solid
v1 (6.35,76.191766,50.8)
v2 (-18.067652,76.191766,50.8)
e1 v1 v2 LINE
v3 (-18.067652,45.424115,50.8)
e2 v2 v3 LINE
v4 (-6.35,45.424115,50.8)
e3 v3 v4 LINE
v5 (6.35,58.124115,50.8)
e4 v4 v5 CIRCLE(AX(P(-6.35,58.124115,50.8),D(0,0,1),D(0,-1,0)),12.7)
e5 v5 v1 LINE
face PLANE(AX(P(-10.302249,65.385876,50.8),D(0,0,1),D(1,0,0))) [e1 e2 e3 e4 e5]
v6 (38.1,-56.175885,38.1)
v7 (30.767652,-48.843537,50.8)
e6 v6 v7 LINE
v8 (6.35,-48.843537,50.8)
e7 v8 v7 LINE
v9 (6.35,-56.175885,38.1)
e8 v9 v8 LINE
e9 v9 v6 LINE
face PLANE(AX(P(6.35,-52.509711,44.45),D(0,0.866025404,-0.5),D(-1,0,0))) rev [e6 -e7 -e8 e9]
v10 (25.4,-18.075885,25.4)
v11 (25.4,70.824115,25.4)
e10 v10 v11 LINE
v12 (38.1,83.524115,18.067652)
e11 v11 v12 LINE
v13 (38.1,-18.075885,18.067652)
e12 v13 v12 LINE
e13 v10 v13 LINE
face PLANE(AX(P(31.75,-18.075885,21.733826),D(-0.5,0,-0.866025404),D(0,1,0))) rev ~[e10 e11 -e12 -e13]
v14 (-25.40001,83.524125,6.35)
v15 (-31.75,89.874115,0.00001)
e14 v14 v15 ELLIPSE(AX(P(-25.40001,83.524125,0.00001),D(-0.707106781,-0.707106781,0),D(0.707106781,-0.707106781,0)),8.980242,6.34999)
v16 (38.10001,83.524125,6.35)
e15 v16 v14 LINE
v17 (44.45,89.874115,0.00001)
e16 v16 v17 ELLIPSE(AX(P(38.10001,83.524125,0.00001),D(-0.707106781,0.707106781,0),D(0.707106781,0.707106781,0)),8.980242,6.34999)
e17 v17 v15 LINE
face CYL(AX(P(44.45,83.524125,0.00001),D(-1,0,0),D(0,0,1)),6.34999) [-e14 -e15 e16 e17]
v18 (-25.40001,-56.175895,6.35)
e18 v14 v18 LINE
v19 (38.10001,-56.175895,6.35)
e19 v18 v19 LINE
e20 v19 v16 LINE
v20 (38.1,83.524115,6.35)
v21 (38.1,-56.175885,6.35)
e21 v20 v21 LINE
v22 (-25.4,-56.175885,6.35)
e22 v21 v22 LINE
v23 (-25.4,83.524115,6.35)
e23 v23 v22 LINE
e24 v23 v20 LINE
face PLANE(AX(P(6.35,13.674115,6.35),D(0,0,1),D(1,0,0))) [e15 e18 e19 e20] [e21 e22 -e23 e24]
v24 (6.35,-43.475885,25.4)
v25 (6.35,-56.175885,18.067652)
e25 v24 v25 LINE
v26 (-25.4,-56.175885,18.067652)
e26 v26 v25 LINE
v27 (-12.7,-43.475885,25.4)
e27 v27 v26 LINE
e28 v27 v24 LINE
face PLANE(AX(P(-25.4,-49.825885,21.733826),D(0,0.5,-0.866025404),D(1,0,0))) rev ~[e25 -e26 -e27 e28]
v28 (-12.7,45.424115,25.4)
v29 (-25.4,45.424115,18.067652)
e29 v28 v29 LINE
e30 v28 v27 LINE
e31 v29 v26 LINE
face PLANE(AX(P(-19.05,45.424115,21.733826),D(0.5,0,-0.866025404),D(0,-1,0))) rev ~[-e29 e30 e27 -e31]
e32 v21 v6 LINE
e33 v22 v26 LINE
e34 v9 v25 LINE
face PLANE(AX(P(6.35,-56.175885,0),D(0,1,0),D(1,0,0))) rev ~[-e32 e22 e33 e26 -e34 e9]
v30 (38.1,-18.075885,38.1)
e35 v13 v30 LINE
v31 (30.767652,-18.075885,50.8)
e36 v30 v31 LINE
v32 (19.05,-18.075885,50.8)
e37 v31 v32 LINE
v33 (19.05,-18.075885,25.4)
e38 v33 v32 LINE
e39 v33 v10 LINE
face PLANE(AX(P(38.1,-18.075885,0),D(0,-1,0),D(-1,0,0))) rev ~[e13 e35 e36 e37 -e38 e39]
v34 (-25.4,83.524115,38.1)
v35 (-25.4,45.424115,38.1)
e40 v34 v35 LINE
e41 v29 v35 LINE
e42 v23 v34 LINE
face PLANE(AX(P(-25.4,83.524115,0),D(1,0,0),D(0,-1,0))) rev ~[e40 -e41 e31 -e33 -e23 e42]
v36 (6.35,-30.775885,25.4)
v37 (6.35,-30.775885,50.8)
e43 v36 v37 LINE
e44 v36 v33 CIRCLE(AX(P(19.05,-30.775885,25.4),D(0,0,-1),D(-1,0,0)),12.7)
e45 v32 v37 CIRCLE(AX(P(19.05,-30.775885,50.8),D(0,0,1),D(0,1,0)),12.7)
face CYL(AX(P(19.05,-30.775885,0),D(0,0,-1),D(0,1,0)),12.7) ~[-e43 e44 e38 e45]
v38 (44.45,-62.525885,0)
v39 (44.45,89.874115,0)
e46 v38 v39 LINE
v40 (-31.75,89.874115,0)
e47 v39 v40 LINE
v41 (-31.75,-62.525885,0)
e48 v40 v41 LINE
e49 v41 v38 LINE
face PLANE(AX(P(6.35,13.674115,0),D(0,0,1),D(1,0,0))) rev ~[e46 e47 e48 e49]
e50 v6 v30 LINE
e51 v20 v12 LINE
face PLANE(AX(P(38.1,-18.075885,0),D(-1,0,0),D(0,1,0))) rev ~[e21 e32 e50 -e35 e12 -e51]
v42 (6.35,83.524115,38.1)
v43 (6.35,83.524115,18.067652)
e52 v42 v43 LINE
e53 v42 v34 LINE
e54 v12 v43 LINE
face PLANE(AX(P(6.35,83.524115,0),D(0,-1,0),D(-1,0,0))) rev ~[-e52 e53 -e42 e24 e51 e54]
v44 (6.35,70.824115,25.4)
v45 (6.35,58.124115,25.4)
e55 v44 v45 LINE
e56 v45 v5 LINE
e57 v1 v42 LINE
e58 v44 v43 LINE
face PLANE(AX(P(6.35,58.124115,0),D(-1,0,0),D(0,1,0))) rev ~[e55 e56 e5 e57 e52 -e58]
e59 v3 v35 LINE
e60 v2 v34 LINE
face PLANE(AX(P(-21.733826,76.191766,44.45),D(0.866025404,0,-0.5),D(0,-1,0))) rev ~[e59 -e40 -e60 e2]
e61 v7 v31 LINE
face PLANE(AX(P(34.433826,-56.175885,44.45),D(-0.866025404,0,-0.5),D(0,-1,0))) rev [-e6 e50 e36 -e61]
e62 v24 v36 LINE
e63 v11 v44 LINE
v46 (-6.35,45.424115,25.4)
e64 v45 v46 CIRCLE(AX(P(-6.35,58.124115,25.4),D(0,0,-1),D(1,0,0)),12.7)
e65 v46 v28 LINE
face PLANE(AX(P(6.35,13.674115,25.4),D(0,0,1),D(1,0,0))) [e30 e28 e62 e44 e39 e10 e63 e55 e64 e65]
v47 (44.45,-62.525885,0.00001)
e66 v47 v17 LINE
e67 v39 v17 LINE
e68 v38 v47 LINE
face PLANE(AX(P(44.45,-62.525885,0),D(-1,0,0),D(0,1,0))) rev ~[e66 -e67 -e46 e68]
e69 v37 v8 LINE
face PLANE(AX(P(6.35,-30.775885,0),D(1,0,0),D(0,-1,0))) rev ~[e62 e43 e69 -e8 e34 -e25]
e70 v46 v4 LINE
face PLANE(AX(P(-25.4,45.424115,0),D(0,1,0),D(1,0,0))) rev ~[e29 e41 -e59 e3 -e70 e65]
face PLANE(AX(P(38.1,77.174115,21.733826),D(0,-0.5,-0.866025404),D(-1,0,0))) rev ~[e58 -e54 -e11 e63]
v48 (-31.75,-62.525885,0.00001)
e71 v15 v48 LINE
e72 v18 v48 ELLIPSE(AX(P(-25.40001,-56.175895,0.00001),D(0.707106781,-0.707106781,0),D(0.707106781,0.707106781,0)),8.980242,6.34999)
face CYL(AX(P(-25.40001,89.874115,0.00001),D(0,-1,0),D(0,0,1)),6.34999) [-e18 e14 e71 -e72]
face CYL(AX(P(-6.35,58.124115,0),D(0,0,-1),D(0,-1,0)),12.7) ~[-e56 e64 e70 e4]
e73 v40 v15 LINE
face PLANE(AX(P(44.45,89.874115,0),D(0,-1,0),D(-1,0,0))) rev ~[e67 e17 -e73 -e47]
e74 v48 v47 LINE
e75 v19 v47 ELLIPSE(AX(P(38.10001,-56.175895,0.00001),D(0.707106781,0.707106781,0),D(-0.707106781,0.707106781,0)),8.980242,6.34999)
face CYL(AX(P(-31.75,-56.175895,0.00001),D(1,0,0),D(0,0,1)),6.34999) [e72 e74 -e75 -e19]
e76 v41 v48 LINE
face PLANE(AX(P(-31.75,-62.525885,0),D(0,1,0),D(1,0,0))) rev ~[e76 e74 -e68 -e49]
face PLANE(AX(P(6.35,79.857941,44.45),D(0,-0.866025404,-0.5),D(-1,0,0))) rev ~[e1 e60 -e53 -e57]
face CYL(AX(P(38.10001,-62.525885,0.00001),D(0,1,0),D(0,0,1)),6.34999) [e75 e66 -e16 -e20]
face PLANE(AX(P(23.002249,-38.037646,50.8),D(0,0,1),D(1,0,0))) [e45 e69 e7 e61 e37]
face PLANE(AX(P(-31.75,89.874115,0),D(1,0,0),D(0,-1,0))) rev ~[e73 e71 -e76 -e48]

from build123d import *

# Parameters (mm, degrees)
F1_DEPTH    = 6.35
F2_DEPTH    = 25.4
F3_DEPTH    = 50.8
F4_C1_SIZE2 = 12.7
F4_C1_SIZE  = 7.3323484187
F4_C2_SIZE2 = 12.7
F4_C2_SIZE  = 7.3323484187
F5_SIZE2    = 7.3323484187
F5_SIZE     = 12.7
F6_SIZE2    = 7.3323484187
F6_SIZE     = 12.7
F7_R        = 6.34999


# Not quite as in the source:
# - a fillet or chamfer is up to 0.001 mm smaller than in the source, because OpenCascade refuses the exact size


with BuildPart() as f1:
    # F0 (on Top) → F1 (new body)
    with BuildSketch(Plane.XY):
        Polygon((44.45, 89.8741149127), (-31.75, 89.8741149127), (-31.75, 45.4241149127), (-31.75, -62.5258850873), (44.45, -62.5258850873), align=None)
        Polygon((-25.4, -56.1758850873), (-25.4, 45.4241149127), (-25.4, 83.5241149127), (6.35, 83.5241149127), (38.1, 83.5241149127), (38.1, -18.0758850873), (38.1, -56.1758850873), (6.35, -56.1758850873), align=None, mode=Mode.SUBTRACT)
    extrude(amount=F1_DEPTH)

    # F0 (on Top) → F2 (join)
    with BuildSketch(Plane.XY):
        with BuildLine():
            Line((-6.35, 45.4241149127), (-25.4, 45.4241149127))
            Line((-25.4, 45.4241149127), (-25.4, -56.1758850873))
            Line((-25.4, -56.1758850873), (6.35, -56.1758850873))
            Line((6.35, -56.1758850873), (6.35, -30.7758850873))
            ThreePointArc((6.35, -30.7758850873), (10.0697438789, -21.7956289662), (19.05, -18.0758850873))
            Line((19.05, -18.0758850873), (38.1, -18.0758850873))
            Line((38.1, -18.0758850873), (38.1, 83.5241149127))
            Line((38.1, 83.5241149127), (6.35, 83.5241149127))
            Line((6.35, 83.5241149127), (6.35, 58.1241149127))
            ThreePointArc((6.35, 58.1241149127), (2.6302561211, 49.1438587917), (-6.35, 45.4241149127))
        make_face()
    extrude(amount=F2_DEPTH)

    # F0 (on Top) → F3 (join)
    with BuildSketch(Plane.XY):
        with BuildLine():
            Line((-25.4, 83.5241149127), (-25.4, 45.4241149127))
            Line((-25.4, 45.4241149127), (-6.35, 45.4241149127))
            ThreePointArc((-6.35, 45.4241149127), (2.6302561211, 49.1438587917), (6.35, 58.1241149127))
            Line((6.35, 58.1241149127), (6.35, 83.5241149127))
            Line((6.35, 83.5241149127), (-25.4, 83.5241149127))
        make_face()
        with BuildLine():
            Line((6.35, -30.7758850873), (6.35, -56.1758850873))
            Line((6.35, -56.1758850873), (38.1, -56.1758850873))
            Line((38.1, -56.1758850873), (38.1, -18.0758850873))
            Line((38.1, -18.0758850873), (19.05, -18.0758850873))
            ThreePointArc((19.05, -18.0758850873), (10.0697438789, -21.7956289662), (6.35, -30.7758850873))
        make_face()
    extrude(amount=F3_DEPTH)

    # F4: chamfer of 12.7 x 7.3323484187 on 2 edges, made by hand

    # F4_c1
    f4_c1_edges = [f1.edges().sort_by_distance(p)[0] for p in [
        (-9.525, 83.5241149127, 50.8),
    ]]
    f4_c1_side = f1.faces().sort_by_distance((-9.525, 83.3774679444, 50.8))[0]
    chamfer(f4_c1_edges, length=F4_C1_SIZE, length2=F4_C1_SIZE2, reference=f4_c1_side)

    # F4_c2
    f4_c2_edges = [f1.edges().sort_by_distance(p)[0] for p in [
        (-25.4, 60.8079407034, 50.8),
    ]]
    f4_c2_side = f1.faces().sort_by_distance((-25.2533530316, 60.8079407034, 50.8))[0]
    chamfer(f4_c2_edges, length=F4_C2_SIZE, length2=F4_C2_SIZE2, reference=f4_c2_side)

    # F5
    f5_edges = [f1.edges().sort_by_distance(p)[0] for p in [
        (38.1, -37.125885, 50.8),
        (22.225, -56.175885, 50.8),
    ]]
    chamfer(f5_edges, length=F5_SIZE, length2=F5_SIZE2)

    # F6
    f6_edges = [f1.edges().sort_by_distance(p)[0] for p in [
        (-25.4, -5.375885, 25.4),
        (-9.525, -56.175885, 25.4),
        (38.1, 32.724115, 25.4),
        (22.225, 83.524115, 25.4),
    ]]
    f6_side = f1.faces().sort_by_distance((6.35, 13.674115, 25.4))[0]
    chamfer(f6_edges, length=F6_SIZE, length2=F6_SIZE2, reference=f6_side)

    # F7 (radius 6.35 in the source; OpenCascade refuses exactly that, so slightly less here)
    f7_edges = [f1.edges().sort_by_distance(p)[0] for p in [
        (44.45, 13.674115, 6.35),
        (6.35, -62.525885, 6.35),
        (-31.75, 13.674115, 6.35),
        (6.35, 89.874115, 6.35),
    ]]
    fillet(f7_edges, radius=F7_R)


solid = f1.part
